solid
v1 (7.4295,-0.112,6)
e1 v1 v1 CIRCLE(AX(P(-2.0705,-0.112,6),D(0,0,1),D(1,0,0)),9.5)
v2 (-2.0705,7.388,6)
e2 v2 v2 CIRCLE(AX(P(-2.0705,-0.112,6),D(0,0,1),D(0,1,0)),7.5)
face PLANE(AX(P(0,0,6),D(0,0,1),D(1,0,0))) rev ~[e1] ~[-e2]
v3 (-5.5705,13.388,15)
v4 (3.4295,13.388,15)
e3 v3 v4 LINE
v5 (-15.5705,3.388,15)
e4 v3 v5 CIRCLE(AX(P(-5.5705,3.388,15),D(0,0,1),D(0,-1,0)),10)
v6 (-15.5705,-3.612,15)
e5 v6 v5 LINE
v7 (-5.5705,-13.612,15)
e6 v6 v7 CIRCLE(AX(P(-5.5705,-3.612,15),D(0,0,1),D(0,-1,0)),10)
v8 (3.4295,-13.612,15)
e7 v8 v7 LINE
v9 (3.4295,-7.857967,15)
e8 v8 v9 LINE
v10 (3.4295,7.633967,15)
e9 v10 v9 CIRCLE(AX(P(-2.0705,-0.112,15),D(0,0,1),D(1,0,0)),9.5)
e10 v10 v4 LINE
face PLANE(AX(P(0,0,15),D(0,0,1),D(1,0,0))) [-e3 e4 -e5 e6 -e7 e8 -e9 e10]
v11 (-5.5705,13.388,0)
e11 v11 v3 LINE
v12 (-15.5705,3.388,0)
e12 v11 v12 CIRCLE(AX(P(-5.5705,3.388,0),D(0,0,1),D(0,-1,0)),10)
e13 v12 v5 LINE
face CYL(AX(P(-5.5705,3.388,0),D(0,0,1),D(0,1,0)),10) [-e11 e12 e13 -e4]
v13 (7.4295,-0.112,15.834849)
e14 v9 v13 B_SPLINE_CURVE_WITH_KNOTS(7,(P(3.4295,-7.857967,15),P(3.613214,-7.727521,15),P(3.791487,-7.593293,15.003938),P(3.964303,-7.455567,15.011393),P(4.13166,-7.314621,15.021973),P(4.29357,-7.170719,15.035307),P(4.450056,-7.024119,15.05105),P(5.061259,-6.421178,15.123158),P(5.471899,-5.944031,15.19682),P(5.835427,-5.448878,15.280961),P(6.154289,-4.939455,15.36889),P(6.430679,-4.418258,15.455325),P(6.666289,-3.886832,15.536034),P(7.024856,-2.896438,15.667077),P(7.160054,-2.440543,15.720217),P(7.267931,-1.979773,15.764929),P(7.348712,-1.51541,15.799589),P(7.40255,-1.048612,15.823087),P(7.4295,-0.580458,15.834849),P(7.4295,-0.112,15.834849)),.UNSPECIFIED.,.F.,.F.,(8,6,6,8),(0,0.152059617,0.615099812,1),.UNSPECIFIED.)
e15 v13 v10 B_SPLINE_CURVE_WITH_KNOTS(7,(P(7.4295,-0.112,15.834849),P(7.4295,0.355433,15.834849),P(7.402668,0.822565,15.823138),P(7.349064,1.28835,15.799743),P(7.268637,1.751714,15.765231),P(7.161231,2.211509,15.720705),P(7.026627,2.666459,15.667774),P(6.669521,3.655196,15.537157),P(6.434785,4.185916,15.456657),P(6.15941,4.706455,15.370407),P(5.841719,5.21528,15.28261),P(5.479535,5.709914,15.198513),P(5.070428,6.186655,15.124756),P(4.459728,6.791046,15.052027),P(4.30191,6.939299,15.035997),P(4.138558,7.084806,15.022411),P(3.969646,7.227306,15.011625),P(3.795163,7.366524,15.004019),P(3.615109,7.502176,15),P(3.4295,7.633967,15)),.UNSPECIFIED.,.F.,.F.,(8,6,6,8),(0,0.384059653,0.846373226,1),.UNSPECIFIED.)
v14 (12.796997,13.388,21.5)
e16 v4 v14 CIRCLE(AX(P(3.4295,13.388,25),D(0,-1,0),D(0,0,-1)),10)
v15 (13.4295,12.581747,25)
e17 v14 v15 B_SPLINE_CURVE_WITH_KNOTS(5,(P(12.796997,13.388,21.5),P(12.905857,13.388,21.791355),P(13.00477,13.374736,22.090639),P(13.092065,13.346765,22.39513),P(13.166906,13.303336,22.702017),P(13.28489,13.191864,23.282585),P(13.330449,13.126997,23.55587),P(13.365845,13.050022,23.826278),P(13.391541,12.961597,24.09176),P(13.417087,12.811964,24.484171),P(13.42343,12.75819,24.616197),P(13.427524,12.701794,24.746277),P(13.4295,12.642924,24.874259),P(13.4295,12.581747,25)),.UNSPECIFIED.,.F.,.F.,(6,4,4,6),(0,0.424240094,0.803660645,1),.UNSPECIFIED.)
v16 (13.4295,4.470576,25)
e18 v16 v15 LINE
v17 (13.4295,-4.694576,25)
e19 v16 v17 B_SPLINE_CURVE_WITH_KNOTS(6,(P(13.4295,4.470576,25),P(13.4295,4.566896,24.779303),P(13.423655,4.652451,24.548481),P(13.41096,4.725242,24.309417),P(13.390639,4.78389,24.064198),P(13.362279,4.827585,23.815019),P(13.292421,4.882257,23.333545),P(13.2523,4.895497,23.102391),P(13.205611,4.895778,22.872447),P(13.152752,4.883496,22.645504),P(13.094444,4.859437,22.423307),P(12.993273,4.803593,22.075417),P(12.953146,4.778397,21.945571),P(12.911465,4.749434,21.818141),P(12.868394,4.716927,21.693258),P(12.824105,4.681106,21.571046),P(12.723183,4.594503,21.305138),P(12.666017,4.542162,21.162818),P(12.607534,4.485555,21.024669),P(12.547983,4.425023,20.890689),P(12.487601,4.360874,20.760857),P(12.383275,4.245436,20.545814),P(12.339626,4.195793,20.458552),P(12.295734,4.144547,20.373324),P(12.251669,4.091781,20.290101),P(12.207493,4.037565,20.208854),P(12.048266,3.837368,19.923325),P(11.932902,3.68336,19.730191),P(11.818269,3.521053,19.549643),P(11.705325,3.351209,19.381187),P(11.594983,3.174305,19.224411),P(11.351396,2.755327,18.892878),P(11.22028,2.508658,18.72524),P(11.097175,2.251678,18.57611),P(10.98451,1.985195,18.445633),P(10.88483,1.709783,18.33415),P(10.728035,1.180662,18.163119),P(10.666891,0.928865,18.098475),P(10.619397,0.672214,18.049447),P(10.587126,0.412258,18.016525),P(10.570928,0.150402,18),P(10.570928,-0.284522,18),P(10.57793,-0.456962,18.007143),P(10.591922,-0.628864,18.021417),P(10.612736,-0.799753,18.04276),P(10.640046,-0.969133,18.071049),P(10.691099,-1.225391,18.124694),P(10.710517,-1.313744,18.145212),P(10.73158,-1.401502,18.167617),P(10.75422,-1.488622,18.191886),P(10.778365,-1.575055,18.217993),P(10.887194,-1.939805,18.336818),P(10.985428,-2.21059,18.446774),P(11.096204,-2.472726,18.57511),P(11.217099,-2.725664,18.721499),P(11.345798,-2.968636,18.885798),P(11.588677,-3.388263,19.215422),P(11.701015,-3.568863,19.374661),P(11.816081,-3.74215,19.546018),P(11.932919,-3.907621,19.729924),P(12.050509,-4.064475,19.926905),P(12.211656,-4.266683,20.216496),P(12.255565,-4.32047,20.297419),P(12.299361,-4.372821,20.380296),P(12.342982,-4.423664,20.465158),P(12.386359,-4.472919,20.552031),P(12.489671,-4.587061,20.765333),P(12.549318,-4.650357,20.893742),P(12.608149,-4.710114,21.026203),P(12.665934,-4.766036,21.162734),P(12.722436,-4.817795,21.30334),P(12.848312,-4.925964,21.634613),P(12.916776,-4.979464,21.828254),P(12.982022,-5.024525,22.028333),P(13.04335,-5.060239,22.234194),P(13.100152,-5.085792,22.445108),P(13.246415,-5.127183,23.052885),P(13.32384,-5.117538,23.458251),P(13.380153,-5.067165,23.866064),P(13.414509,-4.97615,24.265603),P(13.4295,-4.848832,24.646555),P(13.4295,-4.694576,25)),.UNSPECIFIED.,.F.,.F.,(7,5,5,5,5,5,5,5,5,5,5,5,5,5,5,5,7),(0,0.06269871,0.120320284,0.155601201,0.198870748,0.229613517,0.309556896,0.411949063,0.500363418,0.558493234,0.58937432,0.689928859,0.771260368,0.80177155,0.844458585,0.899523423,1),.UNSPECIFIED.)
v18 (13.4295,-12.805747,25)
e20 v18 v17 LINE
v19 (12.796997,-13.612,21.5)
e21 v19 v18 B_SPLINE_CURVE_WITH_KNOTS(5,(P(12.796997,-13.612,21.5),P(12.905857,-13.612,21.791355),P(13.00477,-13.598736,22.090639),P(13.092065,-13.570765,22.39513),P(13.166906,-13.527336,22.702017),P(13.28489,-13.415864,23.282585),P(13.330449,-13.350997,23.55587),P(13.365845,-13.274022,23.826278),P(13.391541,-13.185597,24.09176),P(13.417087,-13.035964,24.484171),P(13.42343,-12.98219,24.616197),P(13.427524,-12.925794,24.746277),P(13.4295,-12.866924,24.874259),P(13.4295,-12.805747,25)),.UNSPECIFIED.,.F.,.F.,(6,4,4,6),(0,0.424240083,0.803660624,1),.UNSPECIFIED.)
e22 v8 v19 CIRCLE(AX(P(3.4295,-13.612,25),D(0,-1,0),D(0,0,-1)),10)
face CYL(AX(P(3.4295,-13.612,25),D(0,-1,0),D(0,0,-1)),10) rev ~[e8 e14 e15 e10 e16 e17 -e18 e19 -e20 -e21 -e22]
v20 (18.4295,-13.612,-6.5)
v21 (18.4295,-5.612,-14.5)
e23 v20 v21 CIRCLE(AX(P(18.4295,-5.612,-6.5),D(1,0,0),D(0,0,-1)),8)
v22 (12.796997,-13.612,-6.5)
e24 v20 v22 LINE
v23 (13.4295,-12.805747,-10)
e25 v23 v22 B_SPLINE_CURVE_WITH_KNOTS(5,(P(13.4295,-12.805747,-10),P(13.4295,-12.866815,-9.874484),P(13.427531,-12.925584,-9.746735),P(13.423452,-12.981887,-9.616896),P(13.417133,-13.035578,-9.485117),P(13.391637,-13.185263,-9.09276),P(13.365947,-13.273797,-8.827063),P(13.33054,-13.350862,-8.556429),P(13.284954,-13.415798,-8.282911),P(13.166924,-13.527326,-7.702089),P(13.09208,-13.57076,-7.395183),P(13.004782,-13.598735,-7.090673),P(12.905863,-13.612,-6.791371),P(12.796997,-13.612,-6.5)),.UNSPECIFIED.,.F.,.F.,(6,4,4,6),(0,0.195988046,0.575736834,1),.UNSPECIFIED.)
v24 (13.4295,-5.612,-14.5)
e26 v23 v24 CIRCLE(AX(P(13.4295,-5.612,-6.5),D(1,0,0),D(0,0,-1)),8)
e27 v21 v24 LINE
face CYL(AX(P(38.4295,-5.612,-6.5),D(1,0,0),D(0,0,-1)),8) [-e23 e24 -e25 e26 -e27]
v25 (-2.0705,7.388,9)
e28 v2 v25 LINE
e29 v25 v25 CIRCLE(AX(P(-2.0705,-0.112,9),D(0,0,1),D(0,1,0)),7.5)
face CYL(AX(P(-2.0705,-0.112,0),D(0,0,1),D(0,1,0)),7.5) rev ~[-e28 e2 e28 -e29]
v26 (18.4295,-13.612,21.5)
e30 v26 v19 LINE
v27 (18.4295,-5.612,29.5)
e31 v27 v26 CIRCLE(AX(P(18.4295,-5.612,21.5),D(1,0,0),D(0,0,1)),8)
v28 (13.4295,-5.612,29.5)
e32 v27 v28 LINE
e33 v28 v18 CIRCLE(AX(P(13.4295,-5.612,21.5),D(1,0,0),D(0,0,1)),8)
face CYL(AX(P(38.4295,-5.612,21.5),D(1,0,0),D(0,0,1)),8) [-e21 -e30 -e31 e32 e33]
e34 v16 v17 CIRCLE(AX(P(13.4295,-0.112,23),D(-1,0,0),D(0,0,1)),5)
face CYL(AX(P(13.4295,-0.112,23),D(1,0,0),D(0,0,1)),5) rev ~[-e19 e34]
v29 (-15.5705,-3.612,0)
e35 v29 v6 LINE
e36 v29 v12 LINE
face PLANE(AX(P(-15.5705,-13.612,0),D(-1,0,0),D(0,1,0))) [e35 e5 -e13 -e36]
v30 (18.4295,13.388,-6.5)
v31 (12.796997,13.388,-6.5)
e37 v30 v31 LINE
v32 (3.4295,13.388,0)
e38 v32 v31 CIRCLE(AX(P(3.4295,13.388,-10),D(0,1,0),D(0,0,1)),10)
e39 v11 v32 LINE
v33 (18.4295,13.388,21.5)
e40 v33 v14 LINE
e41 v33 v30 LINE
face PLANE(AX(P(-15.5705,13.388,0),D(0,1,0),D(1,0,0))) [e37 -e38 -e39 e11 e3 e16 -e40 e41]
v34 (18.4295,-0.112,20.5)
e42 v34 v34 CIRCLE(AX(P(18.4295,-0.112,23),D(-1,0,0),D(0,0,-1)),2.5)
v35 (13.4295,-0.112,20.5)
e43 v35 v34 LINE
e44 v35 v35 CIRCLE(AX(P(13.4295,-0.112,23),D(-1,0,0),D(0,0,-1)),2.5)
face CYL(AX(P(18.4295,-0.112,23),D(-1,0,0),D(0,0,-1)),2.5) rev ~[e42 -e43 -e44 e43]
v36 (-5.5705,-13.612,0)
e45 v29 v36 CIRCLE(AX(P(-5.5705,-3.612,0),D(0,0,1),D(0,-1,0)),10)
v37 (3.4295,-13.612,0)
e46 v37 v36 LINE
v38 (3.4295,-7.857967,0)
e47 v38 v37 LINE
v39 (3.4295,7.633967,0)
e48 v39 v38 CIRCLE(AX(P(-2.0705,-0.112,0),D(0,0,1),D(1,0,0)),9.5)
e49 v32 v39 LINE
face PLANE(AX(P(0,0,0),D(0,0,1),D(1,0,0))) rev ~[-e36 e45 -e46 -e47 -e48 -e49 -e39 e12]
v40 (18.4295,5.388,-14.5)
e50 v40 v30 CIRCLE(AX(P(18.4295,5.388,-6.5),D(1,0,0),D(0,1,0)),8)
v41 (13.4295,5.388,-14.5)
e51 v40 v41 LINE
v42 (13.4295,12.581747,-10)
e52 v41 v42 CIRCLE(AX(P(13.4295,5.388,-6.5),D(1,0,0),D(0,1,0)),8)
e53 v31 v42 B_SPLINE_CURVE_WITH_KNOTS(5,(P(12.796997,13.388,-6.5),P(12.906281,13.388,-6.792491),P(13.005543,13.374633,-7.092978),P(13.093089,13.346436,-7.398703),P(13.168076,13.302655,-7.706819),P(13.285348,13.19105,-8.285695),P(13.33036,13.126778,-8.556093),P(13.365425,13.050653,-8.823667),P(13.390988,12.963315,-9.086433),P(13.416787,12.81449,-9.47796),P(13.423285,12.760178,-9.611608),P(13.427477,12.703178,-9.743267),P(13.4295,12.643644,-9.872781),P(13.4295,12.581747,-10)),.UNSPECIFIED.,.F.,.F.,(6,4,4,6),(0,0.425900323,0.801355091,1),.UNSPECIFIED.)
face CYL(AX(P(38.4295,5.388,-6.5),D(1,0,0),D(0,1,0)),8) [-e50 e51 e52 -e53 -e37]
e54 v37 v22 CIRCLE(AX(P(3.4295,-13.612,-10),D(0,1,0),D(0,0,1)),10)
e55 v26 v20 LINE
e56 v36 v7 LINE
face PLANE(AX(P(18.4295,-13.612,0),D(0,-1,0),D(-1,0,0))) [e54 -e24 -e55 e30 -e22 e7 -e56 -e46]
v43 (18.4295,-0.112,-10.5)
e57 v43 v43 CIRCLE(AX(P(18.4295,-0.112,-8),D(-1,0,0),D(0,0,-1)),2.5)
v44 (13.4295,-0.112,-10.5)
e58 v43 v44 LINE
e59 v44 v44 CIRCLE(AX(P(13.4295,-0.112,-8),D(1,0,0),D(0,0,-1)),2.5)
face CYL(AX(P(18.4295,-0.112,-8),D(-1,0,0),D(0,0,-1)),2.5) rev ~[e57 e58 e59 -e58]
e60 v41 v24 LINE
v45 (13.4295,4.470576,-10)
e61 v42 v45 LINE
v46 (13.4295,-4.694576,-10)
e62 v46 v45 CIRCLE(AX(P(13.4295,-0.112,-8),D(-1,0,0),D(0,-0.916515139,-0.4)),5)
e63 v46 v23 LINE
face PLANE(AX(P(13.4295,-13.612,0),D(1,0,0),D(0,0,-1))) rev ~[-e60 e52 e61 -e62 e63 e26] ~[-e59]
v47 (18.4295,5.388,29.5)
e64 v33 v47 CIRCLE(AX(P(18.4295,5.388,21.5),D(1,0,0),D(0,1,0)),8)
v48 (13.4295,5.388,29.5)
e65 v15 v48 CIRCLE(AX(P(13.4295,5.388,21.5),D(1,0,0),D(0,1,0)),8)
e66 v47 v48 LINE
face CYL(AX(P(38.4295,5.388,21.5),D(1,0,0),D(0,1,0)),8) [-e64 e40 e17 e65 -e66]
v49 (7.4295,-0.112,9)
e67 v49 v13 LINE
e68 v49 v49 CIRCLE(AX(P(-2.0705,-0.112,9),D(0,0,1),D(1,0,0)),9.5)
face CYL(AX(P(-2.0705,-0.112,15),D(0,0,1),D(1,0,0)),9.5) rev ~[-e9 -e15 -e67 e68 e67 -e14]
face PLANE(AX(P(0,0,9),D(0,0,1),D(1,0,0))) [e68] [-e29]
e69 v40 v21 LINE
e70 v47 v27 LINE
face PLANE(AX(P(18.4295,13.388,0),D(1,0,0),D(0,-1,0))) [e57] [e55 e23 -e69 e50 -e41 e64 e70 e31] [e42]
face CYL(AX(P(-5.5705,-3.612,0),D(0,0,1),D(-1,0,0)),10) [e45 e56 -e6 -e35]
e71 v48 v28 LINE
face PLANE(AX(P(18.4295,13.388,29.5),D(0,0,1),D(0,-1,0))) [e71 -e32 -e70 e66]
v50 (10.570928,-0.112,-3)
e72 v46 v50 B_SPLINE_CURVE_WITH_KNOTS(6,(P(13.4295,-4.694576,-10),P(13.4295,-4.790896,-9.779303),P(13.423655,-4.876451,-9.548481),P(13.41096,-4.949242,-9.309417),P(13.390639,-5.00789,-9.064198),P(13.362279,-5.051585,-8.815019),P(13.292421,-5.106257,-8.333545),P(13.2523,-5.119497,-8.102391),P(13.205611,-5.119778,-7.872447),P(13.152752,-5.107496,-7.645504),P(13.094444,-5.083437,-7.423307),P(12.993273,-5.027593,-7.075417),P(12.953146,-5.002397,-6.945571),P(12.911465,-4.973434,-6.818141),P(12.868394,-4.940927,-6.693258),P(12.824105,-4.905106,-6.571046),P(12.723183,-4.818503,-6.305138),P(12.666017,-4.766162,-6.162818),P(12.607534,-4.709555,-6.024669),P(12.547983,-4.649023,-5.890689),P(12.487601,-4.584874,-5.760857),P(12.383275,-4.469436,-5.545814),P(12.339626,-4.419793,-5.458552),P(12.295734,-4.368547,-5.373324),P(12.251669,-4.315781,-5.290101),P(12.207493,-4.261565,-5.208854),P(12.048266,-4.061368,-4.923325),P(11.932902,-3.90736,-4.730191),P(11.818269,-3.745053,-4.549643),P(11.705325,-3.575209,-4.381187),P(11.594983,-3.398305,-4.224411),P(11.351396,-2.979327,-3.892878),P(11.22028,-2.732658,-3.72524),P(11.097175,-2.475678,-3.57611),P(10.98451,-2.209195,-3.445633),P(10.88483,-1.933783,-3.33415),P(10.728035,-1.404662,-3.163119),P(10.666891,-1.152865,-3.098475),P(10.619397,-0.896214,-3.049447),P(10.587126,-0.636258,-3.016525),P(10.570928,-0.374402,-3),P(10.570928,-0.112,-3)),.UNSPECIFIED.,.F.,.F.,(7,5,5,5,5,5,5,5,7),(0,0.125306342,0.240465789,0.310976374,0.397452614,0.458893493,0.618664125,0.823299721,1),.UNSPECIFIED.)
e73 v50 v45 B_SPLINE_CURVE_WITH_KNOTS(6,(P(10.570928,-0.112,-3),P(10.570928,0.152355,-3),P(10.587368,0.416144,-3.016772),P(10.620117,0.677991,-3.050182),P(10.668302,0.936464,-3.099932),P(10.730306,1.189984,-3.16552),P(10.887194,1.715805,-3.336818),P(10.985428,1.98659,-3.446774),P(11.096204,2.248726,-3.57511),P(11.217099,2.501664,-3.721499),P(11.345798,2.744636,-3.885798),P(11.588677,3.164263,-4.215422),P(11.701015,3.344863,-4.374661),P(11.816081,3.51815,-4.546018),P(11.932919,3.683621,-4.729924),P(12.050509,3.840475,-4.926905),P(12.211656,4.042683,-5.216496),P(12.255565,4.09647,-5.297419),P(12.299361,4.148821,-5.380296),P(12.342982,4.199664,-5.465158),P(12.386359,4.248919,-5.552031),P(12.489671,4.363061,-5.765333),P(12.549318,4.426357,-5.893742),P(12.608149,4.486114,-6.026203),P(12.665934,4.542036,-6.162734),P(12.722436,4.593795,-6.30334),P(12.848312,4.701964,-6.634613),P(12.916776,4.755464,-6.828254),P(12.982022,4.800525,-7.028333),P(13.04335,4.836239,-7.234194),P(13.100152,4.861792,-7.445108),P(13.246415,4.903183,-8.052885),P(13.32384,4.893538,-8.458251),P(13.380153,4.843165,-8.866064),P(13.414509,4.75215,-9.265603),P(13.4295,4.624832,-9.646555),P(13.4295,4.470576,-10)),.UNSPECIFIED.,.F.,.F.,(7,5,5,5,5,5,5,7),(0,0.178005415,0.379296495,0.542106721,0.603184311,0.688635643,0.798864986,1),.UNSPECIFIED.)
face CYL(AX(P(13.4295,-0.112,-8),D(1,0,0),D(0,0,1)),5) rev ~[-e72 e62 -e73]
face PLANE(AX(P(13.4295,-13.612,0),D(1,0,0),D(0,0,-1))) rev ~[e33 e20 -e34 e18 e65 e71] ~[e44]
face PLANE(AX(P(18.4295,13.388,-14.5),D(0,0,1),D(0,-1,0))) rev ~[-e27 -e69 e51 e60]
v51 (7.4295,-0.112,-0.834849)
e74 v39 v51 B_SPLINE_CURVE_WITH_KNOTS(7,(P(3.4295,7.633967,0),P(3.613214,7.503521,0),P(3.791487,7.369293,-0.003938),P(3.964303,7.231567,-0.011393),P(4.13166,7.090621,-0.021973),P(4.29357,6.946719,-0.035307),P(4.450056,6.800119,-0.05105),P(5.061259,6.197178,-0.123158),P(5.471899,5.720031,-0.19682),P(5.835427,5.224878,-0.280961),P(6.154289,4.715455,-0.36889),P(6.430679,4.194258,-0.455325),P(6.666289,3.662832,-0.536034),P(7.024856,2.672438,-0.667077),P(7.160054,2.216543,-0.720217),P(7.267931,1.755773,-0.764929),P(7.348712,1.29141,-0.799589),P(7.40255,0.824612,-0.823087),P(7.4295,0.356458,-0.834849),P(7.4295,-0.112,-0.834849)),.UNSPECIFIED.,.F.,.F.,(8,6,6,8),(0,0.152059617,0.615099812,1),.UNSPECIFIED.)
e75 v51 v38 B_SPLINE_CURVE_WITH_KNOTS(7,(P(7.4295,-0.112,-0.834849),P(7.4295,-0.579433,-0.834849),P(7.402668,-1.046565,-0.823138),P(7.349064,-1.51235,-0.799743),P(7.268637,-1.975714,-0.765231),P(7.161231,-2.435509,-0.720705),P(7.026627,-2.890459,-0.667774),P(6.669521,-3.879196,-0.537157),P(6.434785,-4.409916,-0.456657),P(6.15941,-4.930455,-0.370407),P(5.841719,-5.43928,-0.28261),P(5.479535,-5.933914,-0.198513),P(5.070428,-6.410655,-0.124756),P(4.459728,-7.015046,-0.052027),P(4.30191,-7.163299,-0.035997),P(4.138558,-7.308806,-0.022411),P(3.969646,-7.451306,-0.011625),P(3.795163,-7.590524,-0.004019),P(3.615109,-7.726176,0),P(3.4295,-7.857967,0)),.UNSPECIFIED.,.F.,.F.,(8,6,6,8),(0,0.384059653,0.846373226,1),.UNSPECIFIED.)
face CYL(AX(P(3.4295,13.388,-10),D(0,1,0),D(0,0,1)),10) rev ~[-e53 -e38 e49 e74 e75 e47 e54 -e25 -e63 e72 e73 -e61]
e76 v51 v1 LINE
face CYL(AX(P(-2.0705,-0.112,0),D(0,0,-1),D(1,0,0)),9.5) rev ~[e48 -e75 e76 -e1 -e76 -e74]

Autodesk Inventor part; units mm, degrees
ref_plane "YZ Plane" through (0, 0, 0) normal (1, 0, 0) x (0, 1, 0)
ref_plane "XZ Plane" through (0, 0, 0) normal (0, 1, 0) x (-1, 0, 0)
ref_plane "XY Plane" through (0, 0, 0) normal (0, 0, 1) x (1, 0, 0)
sketch "Szkic1" plane through (0, 0, 0) normal (0, 0, 1) x (1, 0, 0)
  line L0 (-15.5705, 13.388) -> (18.4295, 13.388)
  line L1 (18.4295, 13.388) -> (18.4295, -13.612)
  line L2 (18.4295, -13.612) -> (-15.5705, -13.612)
  line L3 (-15.5705, -13.612) -> (-15.5705, 13.388)
  circle A0 centre (-2.0705, -0.112) radius 9.5
  point P0 (0, 0)
  dimension "d0" = 27
  dimension "d1" = 34
  dimension "d2" = 20.5
  dimension "d3" = 13.5
  dimension "d4" = 19
extrude "Wyciągnięcie proste1" add sketch "Szkic1" along normal blind 15 contours L0 L1 L2 L3 | A0
extrude "Wyciągnięcie proste2" cut sketch "Szkic1" along normal blind 6 contours A0
sketch "Szkic2" plane through (0, 0, 15) normal (0, 0, 1) x (1, 0, 0)
  circle A0 centre (-2.0705, -0.112) radius 9.5 projected
  line L0 (18.4295, 13.388) -> (-15.5705, 13.388) projected
  line L1 (-15.5705, 13.388) -> (-15.5705, -13.612) projected
  line L2 (-15.5705, -13.612) -> (18.4295, -13.612) projected
  line L3 (18.4295, -13.612) -> (18.4295, 13.388) projected
  point P0 (0, 0)
extrude "Wyciągnięcie proste3" cut sketch "Szkic2" against normal blind 6 contours A0
hole "Otwór1" at (-2.0705, -0.112, 0) direction (0, 0, 1) diameter 15 end through all
fillet "Zaokrąglenie1" radius 10 2 edges at (-15.5705, 13.388, 7.5) (-15.5705, -13.612, 7.5)
sketch "Szkic3" plane through (18.4295, -13.612, 0) normal (1, 0, 0) x (0, 0, -1)
  line L0 (0, 27) -> (0, 0) projected
  line L1 (0, 27) -> (-15, 27) projected
  line L2 (-15, 0) -> (-15, 27) projected
  line L3 (0, 0) -> (-15, 0) projected
  line L4 (-15, 27) -> (-29.5, 27)
  line L5 (-29.5, 27) -> (-29.5, 0)
  line L6 (-29.5, 0) -> (-15, 0)
  line L7 (0, 27) -> (14.5, 27)
  line L8 (14.5, 27) -> (14.5, 0)
  line L9 (14.5, 0) -> (0, 0)
  point P0 (0, 13.612)
  point P1 (-23, 13.5)
  point P2 (8, 13.5)
  dimension "d21" = 14.5
  dimension "d22" = 14.5
  dimension "d23" = 6.5
  dimension "d24" = 6.5
  dimension "d25" = 27
  dimension "d26" = 13.5
  dimension "d27" = 13.5
extrude "Wyciągnięcie proste4" add sketch "Szkic3" against normal blind 5 contours L7 L8 L9 L0 | L2 L6 L5 L4
hole "Otwór2" at (18.4295, -0.112, 23) at (18.4295, -0.112, -8) direction (-1, 0, 0) diameter 5 end through all
fillet "Zaokrąglenie2" radius 10 2 edges at (13.4295, -0.112, 15) (13.4295, -0.112, 0)
fillet "Zaokrąglenie3" radius 8 4 edges at (15.9295, 13.388, -14.5) (15.9295, -13.612, -14.5) (15.9295, -13.612, 29.5) (15.9295, 13.388, 29.5)
sketch "Szkic4" plane through (13.4295, -13.612, 0) normal (-1, 0, 0) x (0, 0, 1)
  arc A0 (-10, 15) -> (-10, 12) centre (-8, 13.5) ccw projected
  arc A1 (25, 12) -> (25, 15) centre (23, 13.5) ccw projected
  circle A2 centre (-8, 13.5) radius 5
  circle A3 centre (23, 13.5) radius 5
  point P0 (0, 13.612)
  dimension "d37" = 10
  dimension "d38" = 10
extrude "Wyciągnięcie proste5" cut sketch "Szkic4" along normal blind 5
equation "\"d3\" = 0.5 * d0"
equation "\"d24\" = d23"
equation "\"d26\" = 0.5 * d25"
equation "\"d27\" = d26"
properties part number "3DP_ABS_Y_Axis_Pulley_Rod_Mid_Bearing_Block"
